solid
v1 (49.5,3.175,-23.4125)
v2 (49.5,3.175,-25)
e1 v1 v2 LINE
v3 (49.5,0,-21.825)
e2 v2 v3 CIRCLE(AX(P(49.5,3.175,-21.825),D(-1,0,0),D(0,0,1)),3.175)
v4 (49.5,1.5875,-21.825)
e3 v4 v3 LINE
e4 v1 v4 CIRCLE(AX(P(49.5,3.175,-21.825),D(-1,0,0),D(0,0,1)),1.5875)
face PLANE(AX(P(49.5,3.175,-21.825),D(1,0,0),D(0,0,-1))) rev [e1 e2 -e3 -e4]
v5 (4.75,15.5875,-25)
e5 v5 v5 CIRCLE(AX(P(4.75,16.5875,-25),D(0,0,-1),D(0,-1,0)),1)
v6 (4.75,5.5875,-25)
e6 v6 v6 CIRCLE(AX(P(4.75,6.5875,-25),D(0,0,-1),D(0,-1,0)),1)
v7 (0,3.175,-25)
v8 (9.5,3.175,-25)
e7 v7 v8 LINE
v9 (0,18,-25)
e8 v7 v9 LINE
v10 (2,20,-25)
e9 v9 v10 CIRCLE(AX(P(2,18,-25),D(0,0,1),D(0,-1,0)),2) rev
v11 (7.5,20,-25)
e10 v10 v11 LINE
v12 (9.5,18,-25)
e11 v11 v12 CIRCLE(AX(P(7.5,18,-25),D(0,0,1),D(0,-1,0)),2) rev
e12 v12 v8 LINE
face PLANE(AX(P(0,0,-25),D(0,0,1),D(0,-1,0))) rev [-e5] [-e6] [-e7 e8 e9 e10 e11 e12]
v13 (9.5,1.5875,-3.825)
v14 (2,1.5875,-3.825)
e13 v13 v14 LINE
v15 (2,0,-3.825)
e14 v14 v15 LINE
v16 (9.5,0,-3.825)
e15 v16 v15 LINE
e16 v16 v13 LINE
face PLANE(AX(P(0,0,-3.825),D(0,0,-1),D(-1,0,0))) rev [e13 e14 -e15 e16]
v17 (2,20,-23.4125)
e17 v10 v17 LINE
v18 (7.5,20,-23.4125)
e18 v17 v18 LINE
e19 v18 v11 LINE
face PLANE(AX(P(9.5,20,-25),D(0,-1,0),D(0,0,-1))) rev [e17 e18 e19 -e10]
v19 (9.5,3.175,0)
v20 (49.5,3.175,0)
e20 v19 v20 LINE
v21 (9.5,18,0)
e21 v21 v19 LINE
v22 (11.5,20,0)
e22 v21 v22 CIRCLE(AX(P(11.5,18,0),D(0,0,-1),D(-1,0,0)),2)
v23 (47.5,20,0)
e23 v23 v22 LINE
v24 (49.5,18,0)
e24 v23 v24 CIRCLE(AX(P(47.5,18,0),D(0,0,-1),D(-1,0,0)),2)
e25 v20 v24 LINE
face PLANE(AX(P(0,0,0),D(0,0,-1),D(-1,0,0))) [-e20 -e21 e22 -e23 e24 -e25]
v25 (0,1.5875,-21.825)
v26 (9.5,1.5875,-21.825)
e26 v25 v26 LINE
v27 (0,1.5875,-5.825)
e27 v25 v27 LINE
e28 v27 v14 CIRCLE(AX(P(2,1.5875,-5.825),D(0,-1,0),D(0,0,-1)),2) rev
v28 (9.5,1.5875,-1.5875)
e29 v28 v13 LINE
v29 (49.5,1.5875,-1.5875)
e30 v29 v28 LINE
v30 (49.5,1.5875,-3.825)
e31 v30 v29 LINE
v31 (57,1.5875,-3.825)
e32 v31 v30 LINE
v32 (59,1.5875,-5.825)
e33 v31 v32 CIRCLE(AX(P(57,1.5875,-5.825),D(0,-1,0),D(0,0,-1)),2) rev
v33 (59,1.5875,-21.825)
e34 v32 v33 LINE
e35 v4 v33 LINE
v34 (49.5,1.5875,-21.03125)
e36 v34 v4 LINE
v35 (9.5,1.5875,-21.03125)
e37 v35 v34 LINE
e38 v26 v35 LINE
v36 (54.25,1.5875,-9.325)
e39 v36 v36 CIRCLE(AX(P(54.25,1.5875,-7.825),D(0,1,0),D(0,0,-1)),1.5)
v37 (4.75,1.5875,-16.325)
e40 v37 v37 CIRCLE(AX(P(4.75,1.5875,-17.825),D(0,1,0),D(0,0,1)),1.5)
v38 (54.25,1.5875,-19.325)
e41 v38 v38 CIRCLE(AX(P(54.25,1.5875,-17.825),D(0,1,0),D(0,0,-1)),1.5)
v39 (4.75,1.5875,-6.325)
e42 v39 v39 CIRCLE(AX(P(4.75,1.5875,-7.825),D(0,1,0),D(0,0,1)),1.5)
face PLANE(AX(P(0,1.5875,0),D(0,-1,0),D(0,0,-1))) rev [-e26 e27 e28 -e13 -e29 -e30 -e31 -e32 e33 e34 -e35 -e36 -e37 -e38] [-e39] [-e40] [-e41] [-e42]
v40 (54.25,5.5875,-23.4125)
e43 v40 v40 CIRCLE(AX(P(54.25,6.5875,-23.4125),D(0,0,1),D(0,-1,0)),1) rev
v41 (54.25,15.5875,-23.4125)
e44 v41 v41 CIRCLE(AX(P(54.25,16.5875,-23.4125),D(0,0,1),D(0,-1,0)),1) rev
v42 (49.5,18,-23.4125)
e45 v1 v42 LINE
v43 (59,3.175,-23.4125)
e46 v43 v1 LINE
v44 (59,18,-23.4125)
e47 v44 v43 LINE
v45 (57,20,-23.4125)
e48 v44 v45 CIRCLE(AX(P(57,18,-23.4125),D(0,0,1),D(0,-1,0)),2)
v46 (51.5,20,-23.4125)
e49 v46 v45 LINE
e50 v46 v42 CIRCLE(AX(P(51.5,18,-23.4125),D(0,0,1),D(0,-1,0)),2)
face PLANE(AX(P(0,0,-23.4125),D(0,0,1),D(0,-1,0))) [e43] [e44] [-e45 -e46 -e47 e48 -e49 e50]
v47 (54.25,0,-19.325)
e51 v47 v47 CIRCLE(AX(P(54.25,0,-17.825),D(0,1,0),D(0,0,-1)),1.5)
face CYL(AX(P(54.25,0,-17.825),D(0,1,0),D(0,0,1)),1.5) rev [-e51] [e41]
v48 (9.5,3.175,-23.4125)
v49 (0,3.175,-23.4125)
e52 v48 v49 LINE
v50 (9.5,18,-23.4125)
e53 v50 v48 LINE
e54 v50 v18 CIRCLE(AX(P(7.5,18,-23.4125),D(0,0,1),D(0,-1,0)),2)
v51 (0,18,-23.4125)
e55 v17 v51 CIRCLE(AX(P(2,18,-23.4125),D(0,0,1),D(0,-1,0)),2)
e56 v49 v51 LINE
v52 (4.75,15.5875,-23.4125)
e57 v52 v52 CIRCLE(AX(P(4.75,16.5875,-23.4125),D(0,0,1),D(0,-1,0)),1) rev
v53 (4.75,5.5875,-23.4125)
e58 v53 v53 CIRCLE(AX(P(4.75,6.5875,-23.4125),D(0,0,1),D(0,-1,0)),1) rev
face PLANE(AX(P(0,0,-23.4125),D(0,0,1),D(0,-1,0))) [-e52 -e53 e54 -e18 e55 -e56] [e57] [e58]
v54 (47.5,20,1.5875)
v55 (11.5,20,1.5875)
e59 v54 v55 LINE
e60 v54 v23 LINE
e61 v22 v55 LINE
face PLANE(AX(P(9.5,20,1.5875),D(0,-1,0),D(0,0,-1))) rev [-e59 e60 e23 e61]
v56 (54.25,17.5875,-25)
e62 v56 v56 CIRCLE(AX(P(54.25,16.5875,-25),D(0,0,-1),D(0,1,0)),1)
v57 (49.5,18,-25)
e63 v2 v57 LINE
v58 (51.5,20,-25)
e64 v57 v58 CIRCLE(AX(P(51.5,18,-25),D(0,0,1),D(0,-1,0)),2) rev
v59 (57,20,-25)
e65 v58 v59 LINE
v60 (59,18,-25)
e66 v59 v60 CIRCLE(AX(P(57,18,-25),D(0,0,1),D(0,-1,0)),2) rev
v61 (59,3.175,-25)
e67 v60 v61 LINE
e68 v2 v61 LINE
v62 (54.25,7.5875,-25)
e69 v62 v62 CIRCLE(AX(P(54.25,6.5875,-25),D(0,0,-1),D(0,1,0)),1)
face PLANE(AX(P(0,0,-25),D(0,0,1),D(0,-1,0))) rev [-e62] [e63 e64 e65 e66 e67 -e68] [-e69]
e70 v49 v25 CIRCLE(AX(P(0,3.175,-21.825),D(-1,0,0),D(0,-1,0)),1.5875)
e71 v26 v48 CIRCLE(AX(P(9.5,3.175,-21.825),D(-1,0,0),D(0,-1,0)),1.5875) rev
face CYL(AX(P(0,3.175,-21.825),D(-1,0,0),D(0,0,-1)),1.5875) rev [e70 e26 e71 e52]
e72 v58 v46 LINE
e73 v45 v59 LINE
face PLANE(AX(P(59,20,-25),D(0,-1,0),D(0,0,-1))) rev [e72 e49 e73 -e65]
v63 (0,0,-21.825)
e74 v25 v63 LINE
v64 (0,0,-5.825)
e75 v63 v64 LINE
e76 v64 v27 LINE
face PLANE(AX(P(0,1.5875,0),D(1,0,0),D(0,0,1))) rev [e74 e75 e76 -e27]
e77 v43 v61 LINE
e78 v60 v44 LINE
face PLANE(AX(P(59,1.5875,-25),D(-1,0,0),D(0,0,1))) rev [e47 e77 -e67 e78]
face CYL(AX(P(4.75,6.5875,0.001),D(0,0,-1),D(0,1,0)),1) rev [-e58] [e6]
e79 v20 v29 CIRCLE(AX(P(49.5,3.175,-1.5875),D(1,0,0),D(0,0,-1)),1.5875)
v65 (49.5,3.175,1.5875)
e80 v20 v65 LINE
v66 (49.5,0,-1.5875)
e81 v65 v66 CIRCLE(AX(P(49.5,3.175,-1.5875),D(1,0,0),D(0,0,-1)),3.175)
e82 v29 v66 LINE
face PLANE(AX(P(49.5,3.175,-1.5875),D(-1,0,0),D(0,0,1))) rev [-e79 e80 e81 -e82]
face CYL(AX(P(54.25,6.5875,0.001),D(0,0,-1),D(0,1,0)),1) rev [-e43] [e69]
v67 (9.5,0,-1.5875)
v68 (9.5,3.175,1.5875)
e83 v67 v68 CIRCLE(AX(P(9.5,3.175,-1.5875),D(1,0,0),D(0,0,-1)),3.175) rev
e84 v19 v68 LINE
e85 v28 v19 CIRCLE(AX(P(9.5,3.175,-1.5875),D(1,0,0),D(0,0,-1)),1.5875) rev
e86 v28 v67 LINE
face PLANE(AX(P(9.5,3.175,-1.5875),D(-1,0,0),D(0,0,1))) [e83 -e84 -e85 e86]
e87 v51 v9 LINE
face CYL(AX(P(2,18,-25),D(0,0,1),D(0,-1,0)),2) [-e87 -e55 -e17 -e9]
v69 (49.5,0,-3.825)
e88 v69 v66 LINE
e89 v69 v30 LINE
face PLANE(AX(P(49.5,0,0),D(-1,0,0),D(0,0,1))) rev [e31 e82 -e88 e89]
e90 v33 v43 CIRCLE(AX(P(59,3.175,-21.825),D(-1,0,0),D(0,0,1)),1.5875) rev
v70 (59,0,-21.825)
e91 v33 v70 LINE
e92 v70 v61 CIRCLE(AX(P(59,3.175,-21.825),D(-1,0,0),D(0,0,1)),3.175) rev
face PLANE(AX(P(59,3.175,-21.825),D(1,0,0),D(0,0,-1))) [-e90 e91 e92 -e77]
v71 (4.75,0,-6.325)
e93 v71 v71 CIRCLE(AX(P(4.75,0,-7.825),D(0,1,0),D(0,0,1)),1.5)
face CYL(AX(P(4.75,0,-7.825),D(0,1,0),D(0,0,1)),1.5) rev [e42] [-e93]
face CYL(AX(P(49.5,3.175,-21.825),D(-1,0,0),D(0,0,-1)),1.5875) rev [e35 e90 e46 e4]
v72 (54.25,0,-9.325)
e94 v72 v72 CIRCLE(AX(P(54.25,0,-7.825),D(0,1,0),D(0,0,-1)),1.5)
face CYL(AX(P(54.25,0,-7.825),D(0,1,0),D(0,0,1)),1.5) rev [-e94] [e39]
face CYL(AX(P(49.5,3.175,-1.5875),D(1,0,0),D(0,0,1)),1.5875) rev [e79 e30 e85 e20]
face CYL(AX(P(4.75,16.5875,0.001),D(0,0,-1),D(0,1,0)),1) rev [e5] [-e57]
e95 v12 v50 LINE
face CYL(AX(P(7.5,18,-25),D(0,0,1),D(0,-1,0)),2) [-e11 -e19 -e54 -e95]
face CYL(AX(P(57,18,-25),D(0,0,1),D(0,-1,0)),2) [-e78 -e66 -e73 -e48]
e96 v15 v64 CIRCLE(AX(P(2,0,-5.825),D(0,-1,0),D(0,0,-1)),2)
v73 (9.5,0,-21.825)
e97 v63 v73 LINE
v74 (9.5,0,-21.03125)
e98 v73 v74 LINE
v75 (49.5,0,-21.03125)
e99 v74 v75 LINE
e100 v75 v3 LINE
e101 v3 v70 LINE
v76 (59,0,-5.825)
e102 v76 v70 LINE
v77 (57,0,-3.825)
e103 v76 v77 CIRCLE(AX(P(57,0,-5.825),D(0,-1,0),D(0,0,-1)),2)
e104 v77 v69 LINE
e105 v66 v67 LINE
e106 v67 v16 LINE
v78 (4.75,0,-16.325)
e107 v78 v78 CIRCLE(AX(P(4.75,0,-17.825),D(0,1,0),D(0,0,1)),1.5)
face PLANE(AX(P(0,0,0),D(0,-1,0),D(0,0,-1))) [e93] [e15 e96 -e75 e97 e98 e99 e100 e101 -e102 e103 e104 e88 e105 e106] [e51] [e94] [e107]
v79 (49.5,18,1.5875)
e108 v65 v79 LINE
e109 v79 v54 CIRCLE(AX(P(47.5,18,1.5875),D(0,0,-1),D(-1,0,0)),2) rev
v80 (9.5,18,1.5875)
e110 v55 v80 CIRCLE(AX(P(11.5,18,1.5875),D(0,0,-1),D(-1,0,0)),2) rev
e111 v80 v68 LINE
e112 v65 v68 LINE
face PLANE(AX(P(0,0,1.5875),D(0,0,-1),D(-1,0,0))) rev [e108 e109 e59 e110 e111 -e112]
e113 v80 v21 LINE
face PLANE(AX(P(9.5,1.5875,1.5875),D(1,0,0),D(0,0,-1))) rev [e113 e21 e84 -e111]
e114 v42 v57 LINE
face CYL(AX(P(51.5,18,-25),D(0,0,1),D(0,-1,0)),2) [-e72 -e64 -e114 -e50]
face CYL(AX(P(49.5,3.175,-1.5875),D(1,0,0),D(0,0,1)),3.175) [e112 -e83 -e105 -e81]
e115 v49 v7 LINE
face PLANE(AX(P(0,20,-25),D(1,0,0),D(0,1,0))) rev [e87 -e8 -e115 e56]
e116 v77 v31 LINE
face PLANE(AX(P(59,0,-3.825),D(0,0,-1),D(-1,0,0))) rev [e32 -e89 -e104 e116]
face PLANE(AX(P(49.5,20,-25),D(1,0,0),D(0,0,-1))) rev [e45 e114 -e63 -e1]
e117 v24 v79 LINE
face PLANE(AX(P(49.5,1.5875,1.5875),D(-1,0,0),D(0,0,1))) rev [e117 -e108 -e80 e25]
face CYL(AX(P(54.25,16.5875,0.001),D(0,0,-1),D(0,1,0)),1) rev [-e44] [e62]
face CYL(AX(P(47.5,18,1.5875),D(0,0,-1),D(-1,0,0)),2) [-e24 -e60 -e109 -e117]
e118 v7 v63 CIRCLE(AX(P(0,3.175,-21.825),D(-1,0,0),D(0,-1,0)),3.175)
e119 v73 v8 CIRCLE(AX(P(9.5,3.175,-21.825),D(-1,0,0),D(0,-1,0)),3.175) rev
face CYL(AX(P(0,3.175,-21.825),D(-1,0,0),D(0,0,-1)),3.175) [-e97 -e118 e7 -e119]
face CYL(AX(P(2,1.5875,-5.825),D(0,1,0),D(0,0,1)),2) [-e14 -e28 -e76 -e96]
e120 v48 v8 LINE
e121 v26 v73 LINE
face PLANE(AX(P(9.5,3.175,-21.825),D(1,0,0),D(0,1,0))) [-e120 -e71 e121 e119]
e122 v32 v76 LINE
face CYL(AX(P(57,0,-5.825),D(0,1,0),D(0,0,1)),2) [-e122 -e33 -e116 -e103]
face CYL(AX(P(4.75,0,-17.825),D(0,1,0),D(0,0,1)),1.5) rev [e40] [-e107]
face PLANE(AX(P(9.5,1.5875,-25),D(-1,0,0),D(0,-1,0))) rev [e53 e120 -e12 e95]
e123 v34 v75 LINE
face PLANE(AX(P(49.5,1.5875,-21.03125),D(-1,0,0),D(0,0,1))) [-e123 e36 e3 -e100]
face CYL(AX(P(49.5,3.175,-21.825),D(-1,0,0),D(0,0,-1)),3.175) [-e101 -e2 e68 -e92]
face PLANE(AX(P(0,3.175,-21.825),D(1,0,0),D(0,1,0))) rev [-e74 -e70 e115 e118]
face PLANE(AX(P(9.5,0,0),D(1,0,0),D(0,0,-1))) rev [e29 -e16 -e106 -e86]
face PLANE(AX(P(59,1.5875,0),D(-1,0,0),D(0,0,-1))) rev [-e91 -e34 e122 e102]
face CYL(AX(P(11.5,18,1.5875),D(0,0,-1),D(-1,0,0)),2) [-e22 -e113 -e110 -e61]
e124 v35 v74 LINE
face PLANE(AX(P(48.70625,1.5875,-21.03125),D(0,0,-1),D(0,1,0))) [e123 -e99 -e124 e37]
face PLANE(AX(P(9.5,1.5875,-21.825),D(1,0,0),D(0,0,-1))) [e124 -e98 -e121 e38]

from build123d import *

# Parameters (mm, degrees)
SKETCH2_W                     = 59
SKETCH2_H                     = 25
BOSS_EXTRUDE1_DEPTH           = 1.5875
EDGE_FLANGE2_STRIP_W          = 9.525
EDGE_FLANGE2_STRIP_H          = 1.5875
EDGE_FLANGE2_STRIP_CUT_DEPTH  = 9.5
EDGE_FLANGE2_RELIEF_W         = 10.31875
EDGE_FLANGE2_RELIEF_H         = 0.79375
EDGE_FLANGE2_RELIEF_CUT_DEPTH = 1.5875
EDGE_FLANGE2_DEPTH            = 9.5
EDGE_FLANGE3_STRIP_W          = 9.525
EDGE_FLANGE3_STRIP_H          = 1.5875
EDGE_FLANGE3_STRIP_CUT_DEPTH  = 9.5
EDGE_FLANGE3_RELIEF_W         = 10.31875
EDGE_FLANGE3_RELIEF_H         = 0.79375
EDGE_FLANGE3_RELIEF_CUT_DEPTH = 1.5875
EDGE_FLANGE3_DEPTH            = 9.5
CUT_EXTRUDE1_REACH            = 69.127
SKETCH16_R                    = 1
SKETCH18_W                    = 38.4125
SKETCH18_H                    = 12
BOSS_EXTRUDE2_DEPTH           = 1.5875
SKETCH19_R                    = 1.5
SKETCH19_W                    = 9.5
SKETCH19_H                    = 3.825
CUT_EXTRUDE2_DEPTH            = 1.5875
EDGE_FLANGE4_STRIP_W          = 9.525
EDGE_FLANGE4_STRIP_H          = 1.5875
EDGE_FLANGE4_STRIP_CUT_DEPTH  = 40
EDGE_FLANGE4_DEPTH            = 40
FILLET1_R                     = 2
SKETCH24_W                    = 38.4125
SKETCH24_H                    = 15.96875
CUT_EXTRUDE3_DEPTH            = 10


# Sheet-metal steps are written as plain solids
with BuildPart() as part:
    # Sketch2 → Boss-Extrude1 (new body)
    with BuildSketch(Plane(origin=(0, 0, 0), x_dir=(1, 0, 0), z_dir=(0, 1, 0))):
        with Locations((29.5, 12.5)):
            Rectangle(SKETCH2_W, SKETCH2_H)
    extrude(amount=BOSS_EXTRUDE1_DEPTH)

    # Edge-Flange2 strip (across the edge) → Edge-Flange2 strip cut (cut)
    with BuildSketch(Plane(origin=(59, 1.5875, -25), x_dir=(0, 0, 1), z_dir=(-1, 0, 0))):
        with Locations((-1.5875, -0.79375)):
            Rectangle(EDGE_FLANGE2_STRIP_W, EDGE_FLANGE2_STRIP_H)
    extrude(amount=EDGE_FLANGE2_STRIP_CUT_DEPTH, mode=Mode.SUBTRACT)

    # Edge-Flange2 relief (on the sheet) → Edge-Flange2 relief cut (cut)
    with BuildSketch(Plane(origin=(59, 1.5875, -21.825), x_dir=(0, 0, 1), z_dir=(0, 1, 0))):
        with Locations((-4.365625, -9.896875)):
            Rectangle(EDGE_FLANGE2_RELIEF_W, EDGE_FLANGE2_RELIEF_H)
    extrude(amount=-EDGE_FLANGE2_RELIEF_CUT_DEPTH, mode=Mode.SUBTRACT)

    # Edge-Flange2 section (across the edge) → Edge-Flange2 (add)
    with BuildSketch(Plane(origin=(59, 1.5875, -25), x_dir=(0, 0, 1), z_dir=(-1, 0, 0))):
        with BuildLine():
            Line((0, 1.5875), (0, 18.4125))
            Line((0, 18.4125), (1.5875, 18.4125))
            Line((1.5875, 18.4125), (1.5875, 1.5875))
            ThreePointArc((1.5875, 1.5875), (2.052467985, 0.464967985), (3.175, 0))
            Line((3.175, 0), (3.175, -1.5875))
            ThreePointArc((3.175, -1.5875), (0.92993597, -0.65756403), (0, 1.5875))
        make_face()
    extrude(amount=EDGE_FLANGE2_DEPTH)

    # Edge-Flange3 strip (across the edge) → Edge-Flange3 strip cut (cut)
    with BuildSketch(Plane(origin=(9.5, 1.5875, -25), x_dir=(0, 0, 1), z_dir=(-1, 0, 0))):
        with Locations((-1.5875, -0.79375)):
            Rectangle(EDGE_FLANGE3_STRIP_W, EDGE_FLANGE3_STRIP_H)
    extrude(amount=EDGE_FLANGE3_STRIP_CUT_DEPTH, mode=Mode.SUBTRACT)

    # Edge-Flange3 relief (on the sheet) → Edge-Flange3 relief cut (cut)
    with BuildSketch(Plane(origin=(9.5, 1.5875, -21.825), x_dir=(0, 0, 1), z_dir=(0, 1, 0))):
        with Locations((-4.365625, 0.396875)):
            Rectangle(EDGE_FLANGE3_RELIEF_W, EDGE_FLANGE3_RELIEF_H)
    extrude(amount=-EDGE_FLANGE3_RELIEF_CUT_DEPTH, mode=Mode.SUBTRACT)

    # Edge-Flange3 section (across the edge) → Edge-Flange3 (add)
    with BuildSketch(Plane(origin=(9.5, 1.5875, -25), x_dir=(0, 0, 1), z_dir=(-1, 0, 0))):
        with BuildLine():
            Line((0, 1.5875), (0, 18.4125))
            Line((0, 18.4125), (1.5875, 18.4125))
            Line((1.5875, 18.4125), (1.5875, 1.5875))
            ThreePointArc((1.5875, 1.5875), (2.052467985, 0.464967985), (3.175, 0))
            Line((3.175, 0), (3.175, -1.5875))
            ThreePointArc((3.175, -1.5875), (0.92993597, -0.65756403), (0, 1.5875))
        make_face()
    extrude(amount=EDGE_FLANGE3_DEPTH)

    # Sketch16 → Cut-Extrude1 (cut, up to next)
    with BuildSketch(Plane(origin=(0, 0, -25), x_dir=(-1, 0, 0), z_dir=(0, 0, -1)), mode=Mode.PRIVATE) as cut_extrude1_sk1:
        with Locations(Location((-54.25, 16.5875, 0), (0, 0, 90))):
            Circle(SKETCH16_R)
    cut_extrude1_tool1 = extrude(cut_extrude1_sk1.sketch, amount=-CUT_EXTRUDE1_REACH, mode=Mode.PRIVATE) & part.part
    # Sketch16 → Cut-Extrude1 (cut, up to next)
    with BuildSketch(Plane(origin=(0, 0, -25), x_dir=(-1, 0, 0), z_dir=(0, 0, -1)), mode=Mode.PRIVATE) as cut_extrude1_sk2:
        with Locations(Location((-54.25, 6.5875, 0), (0, 0, 90))):
            Circle(SKETCH16_R)
    cut_extrude1_tool2 = extrude(cut_extrude1_sk2.sketch, amount=-CUT_EXTRUDE1_REACH, mode=Mode.PRIVATE) & part.part
    # Sketch16 → Cut-Extrude1 (cut, up to next)
    with BuildSketch(Plane(origin=(0, 0, -25), x_dir=(-1, 0, 0), z_dir=(0, 0, -1)), mode=Mode.PRIVATE) as cut_extrude1_sk3:
        with Locations(Location((-4.75, 6.5875, 0), (0, 0, 270))):
            Circle(SKETCH16_R)
    cut_extrude1_tool3 = extrude(cut_extrude1_sk3.sketch, amount=-CUT_EXTRUDE1_REACH, mode=Mode.PRIVATE) & part.part
    # Sketch16 → Cut-Extrude1 (cut, up to next)
    with BuildSketch(Plane(origin=(0, 0, -25), x_dir=(-1, 0, 0), z_dir=(0, 0, -1)), mode=Mode.PRIVATE) as cut_extrude1_sk4:
        with Locations(Location((-4.75, 16.5875, 0), (0, 0, 270))):
            Circle(SKETCH16_R)
    cut_extrude1_tool4 = extrude(cut_extrude1_sk4.sketch, amount=-CUT_EXTRUDE1_REACH, mode=Mode.PRIVATE) & part.part
    add(cut_extrude1_tool1.solids().sort_by_distance((54.25, 16.5875, -25))[0], mode=Mode.SUBTRACT)
    add(cut_extrude1_tool2.solids().sort_by_distance((54.25, 6.5875, -25))[0], mode=Mode.SUBTRACT)
    add(cut_extrude1_tool3.solids().sort_by_distance((4.75, 6.5875, -25))[0], mode=Mode.SUBTRACT)
    add(cut_extrude1_tool4.solids().sort_by_distance((4.75, 16.5875, -25))[0], mode=Mode.SUBTRACT)

    # Sketch18 → Boss-Extrude2 (add)
    with BuildSketch(Plane(origin=(0, 1.5875, 0), x_dir=(1, 0, 0), z_dir=(0, 1, 0))):
        with Locations((29.5, 31)):
            Rectangle(SKETCH18_W, SKETCH18_H)
    extrude(amount=-BOSS_EXTRUDE2_DEPTH)

    # Sketch19 → Cut-Extrude2 (cut)
    with BuildSketch(Plane(origin=(0, 1.5875, 0), x_dir=(1, 0, 0), z_dir=(0, 1, 0))):
        with Locations(Location((4.75, 17.825, 0), (0, 0, 270))):
            Circle(SKETCH19_R)
        with Locations(Location((4.75, 7.825, 0), (0, 0, 270))):
            Circle(SKETCH19_R)
        with Locations(Location((54.25, 17.825, 0), (0, 0, 90))):
            Circle(SKETCH19_R)
        with Locations(Location((54.25, 7.825, 0), (0, 0, 90))):
            Circle(SKETCH19_R)
        with Locations((54.25, 1.9125)):
            Rectangle(SKETCH19_W, SKETCH19_H)
        with Locations((4.75, 1.9125)):
            Rectangle(SKETCH19_W, SKETCH19_H)
    extrude(amount=-CUT_EXTRUDE2_DEPTH, mode=Mode.SUBTRACT)

    # Edge-Flange4 strip (across the edge) → Edge-Flange4 strip cut (cut)
    with BuildSketch(Plane(origin=(9.5, 1.5875, 0), x_dir=(0, 0, -1), z_dir=(1, 0, 0))):
        with Locations((-3.175, -0.79375)):
            Rectangle(EDGE_FLANGE4_STRIP_W, EDGE_FLANGE4_STRIP_H)
    extrude(amount=EDGE_FLANGE4_STRIP_CUT_DEPTH, mode=Mode.SUBTRACT)

    # Edge-Flange4 section (across the edge) → Edge-Flange4 (add)
    with BuildSketch(Plane(origin=(9.5, 1.5875, 0), x_dir=(0, 0, -1), z_dir=(1, 0, 0))):
        with BuildLine():
            Line((-1.5875, 1.5875), (-1.5875, 18.4125))
            Line((-1.5875, 18.4125), (0, 18.4125))
            Line((0, 18.4125), (0, 1.5875))
            ThreePointArc((0, 1.5875), (0.464967985, 0.464967985), (1.5875, 0))
            Line((1.5875, 0), (1.5875, -1.5875))
            ThreePointArc((1.5875, -1.5875), (-0.65756403, -0.65756403), (-1.5875, 1.5875))
        make_face()
    extrude(amount=EDGE_FLANGE4_DEPTH)

    # Fillet1
    fillet1_edges = [part.edges().sort_by_distance(p)[0] for p in [
        (10.29375, 0.79375, -37),
        (48.70625, 0.79375, -37),
        (0, 0.79375, -3.825),
        (59, 0.79375, -3.825),
        (9.5, 20, 0.79375),
        (49.5, 20, 0.79375),
        (59, 20, -24.20625),
        (49.5, 20, -24.20625),
        (9.5, 20, -24.20625),
        (0, 20, -24.20625),
    ]]
    fillet(fillet1_edges, radius=FILLET1_R)

    # Sketch24 → Cut-Extrude3 (cut)
    with BuildSketch(Plane(origin=(0, 1.5875, 0), x_dir=(1, 0, 0), z_dir=(0, 1, 0))):
        with Locations((29.5, 29.015625)):
            Rectangle(SKETCH24_W, SKETCH24_H)
    extrude(amount=-CUT_EXTRUDE3_DEPTH, mode=Mode.SUBTRACT)


solid = part.part
